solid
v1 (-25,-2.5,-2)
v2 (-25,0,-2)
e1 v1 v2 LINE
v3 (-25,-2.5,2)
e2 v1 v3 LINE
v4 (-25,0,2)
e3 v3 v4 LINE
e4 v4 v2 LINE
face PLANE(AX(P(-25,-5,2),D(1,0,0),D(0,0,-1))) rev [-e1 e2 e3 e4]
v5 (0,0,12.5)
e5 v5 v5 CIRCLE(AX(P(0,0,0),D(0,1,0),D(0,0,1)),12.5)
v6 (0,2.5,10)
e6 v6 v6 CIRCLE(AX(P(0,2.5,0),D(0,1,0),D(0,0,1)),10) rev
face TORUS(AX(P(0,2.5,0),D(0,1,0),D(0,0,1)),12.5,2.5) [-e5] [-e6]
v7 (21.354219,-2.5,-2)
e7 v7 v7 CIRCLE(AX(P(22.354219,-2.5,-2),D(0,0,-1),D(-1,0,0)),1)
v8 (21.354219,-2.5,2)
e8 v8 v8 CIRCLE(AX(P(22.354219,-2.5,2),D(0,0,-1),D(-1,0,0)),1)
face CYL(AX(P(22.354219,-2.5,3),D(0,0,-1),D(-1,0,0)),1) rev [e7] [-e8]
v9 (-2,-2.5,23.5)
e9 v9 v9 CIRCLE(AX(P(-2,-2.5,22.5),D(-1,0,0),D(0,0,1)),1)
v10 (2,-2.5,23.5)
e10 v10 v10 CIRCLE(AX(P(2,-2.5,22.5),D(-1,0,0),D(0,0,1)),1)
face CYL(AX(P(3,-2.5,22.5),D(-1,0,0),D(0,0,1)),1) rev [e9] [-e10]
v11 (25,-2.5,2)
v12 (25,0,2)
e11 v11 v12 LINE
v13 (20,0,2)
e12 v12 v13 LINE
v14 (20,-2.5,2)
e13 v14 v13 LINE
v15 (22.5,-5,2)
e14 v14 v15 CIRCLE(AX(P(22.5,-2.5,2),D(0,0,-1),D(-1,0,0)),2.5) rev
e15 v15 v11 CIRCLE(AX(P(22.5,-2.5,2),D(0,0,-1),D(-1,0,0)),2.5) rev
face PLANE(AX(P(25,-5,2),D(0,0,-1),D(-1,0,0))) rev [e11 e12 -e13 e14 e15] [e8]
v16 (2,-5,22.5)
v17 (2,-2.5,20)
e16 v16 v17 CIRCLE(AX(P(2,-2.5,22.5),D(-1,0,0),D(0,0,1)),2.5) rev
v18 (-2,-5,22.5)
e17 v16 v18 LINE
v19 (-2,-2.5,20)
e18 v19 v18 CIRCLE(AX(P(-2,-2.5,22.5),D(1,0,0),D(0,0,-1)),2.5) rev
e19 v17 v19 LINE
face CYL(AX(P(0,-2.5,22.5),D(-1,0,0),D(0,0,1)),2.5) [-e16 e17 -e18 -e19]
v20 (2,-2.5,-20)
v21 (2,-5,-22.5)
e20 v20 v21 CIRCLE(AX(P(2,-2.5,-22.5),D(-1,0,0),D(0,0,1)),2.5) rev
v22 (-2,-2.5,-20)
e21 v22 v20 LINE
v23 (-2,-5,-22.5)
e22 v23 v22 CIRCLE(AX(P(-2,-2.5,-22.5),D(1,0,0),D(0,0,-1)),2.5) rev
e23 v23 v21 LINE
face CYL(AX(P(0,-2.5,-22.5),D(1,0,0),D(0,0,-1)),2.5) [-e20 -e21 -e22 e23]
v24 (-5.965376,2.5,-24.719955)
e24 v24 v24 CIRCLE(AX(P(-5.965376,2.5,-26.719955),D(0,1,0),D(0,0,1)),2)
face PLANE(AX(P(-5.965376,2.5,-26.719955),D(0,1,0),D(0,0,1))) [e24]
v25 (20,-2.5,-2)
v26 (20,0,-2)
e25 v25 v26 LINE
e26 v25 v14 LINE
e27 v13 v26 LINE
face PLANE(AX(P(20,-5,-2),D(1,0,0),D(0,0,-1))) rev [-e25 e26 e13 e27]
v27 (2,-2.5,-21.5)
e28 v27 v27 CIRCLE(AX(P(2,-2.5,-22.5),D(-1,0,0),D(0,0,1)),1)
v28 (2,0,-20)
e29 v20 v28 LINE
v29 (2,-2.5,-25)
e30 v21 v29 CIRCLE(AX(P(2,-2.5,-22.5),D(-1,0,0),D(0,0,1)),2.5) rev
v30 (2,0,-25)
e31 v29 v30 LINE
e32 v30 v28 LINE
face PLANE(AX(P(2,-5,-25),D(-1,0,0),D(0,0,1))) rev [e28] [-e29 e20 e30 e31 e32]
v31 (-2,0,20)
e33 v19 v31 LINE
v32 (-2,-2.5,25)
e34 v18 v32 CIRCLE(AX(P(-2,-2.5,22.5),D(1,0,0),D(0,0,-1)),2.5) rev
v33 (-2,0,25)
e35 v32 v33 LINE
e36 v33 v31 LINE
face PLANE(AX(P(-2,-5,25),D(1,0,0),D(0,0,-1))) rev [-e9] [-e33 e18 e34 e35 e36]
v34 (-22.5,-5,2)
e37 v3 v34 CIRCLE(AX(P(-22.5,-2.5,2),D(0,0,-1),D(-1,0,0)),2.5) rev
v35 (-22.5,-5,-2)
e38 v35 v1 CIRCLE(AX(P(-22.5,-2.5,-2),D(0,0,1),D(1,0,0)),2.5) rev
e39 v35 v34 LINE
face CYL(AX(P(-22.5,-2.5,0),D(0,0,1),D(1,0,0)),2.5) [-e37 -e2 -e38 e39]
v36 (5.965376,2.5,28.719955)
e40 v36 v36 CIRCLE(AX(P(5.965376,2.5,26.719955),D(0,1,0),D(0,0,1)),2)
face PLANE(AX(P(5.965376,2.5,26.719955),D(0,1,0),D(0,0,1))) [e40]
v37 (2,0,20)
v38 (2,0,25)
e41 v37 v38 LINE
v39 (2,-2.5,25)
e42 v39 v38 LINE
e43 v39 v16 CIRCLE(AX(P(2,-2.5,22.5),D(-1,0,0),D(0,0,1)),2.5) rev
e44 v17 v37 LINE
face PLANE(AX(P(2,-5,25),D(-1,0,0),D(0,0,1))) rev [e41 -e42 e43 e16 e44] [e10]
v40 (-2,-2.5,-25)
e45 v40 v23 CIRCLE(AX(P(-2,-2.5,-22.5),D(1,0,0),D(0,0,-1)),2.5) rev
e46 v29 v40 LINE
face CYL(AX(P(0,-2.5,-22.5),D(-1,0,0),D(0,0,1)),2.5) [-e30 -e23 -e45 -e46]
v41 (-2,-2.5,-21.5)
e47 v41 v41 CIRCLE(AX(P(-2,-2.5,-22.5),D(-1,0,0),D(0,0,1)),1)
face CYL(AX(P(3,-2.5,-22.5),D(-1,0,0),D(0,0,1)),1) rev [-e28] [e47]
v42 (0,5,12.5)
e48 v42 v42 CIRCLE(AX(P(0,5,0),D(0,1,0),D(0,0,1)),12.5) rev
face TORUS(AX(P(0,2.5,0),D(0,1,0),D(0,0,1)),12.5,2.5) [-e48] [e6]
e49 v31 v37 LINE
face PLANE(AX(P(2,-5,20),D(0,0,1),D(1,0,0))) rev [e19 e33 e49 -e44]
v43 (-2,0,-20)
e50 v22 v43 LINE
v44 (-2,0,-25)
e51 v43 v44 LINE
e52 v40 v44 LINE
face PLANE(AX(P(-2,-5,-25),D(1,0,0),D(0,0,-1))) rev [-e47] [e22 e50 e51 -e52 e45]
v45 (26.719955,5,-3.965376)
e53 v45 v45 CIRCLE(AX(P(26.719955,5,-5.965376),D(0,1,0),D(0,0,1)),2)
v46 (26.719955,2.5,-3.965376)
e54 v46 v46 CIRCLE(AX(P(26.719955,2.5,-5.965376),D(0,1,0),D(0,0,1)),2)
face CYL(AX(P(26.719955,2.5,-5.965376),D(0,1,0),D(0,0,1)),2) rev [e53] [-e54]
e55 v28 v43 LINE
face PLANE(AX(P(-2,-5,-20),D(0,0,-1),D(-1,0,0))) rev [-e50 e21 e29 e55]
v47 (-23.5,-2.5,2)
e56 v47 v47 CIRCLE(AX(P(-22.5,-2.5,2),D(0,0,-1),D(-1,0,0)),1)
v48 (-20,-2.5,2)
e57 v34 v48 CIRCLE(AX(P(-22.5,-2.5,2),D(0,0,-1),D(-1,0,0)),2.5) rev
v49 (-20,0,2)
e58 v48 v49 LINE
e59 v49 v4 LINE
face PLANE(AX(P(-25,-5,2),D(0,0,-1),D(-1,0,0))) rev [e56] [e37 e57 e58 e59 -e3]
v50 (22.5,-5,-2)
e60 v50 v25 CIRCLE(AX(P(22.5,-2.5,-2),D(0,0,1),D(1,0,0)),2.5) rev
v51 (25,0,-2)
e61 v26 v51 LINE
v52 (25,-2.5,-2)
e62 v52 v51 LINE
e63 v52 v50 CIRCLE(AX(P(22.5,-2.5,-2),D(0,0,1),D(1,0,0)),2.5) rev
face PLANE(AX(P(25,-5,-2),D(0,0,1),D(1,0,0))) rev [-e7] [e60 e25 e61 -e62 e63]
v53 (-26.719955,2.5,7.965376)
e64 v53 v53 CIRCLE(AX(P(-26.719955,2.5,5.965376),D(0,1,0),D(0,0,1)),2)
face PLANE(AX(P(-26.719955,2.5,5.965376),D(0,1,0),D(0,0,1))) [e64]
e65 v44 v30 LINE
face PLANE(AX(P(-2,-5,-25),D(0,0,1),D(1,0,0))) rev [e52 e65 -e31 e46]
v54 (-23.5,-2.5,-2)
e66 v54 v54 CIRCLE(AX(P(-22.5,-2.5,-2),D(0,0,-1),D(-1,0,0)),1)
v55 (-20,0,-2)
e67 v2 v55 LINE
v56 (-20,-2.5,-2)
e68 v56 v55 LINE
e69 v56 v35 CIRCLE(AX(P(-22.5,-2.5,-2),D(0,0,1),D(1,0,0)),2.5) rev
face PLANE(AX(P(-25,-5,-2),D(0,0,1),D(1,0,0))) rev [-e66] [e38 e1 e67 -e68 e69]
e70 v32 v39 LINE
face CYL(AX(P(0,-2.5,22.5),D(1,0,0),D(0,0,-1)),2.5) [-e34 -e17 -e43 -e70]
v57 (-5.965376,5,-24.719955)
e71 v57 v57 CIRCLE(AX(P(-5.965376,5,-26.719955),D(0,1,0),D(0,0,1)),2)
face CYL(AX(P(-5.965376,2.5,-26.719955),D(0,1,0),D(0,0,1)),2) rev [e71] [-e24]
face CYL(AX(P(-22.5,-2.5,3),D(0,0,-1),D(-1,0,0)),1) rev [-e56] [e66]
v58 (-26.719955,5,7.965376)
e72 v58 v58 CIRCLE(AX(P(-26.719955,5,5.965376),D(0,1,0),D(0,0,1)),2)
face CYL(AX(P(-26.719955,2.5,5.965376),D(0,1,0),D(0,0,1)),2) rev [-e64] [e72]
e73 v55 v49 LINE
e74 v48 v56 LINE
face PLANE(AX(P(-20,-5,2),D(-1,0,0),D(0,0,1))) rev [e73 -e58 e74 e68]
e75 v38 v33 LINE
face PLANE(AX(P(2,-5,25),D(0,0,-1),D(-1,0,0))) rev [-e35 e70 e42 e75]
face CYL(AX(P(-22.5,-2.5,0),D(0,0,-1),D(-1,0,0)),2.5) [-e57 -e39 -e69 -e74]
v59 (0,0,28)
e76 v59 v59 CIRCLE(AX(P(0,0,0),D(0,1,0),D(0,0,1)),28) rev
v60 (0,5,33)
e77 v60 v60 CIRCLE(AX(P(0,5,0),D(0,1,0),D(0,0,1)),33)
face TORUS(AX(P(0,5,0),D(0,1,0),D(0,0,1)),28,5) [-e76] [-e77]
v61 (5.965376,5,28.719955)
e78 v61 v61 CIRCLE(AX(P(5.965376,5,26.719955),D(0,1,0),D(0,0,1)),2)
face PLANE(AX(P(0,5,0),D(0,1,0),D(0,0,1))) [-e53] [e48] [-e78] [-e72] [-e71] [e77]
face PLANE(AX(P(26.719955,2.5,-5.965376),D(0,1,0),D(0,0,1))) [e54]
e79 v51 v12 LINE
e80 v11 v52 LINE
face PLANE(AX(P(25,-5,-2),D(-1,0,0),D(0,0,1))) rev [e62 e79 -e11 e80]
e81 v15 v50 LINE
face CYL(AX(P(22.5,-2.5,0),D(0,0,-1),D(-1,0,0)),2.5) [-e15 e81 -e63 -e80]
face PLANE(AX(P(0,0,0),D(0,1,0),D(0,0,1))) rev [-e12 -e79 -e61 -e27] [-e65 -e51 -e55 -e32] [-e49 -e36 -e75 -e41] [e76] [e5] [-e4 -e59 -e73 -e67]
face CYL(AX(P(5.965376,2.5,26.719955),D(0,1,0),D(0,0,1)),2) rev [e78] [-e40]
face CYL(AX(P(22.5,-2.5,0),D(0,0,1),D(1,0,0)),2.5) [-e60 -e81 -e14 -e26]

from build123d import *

# Parameters (mm, degrees)
SKETCH1_R           = 33
BOSS_EXTRUDE1_DEPTH = 5
SKETCH2_R           = 2
CUT_EXTRUDE1_DEPTH  = 2.5
FILLET1_R           = 5
SKETCH3_W           = 4
SKETCH3_H           = 5
SKETCH3_W_2         = 5
SKETCH3_H_2         = 4
BOSS_EXTRUDE2_DEPTH = 5
FILLET2_R           = 2.5
SKETCH4_R           = 1
CUT_EXTRUDE2_DEPTH  = 5
SKETCH5_R           = 1
CUT_EXTRUDE3_DEPTH  = 5
SKETCH6_R           = 10
CUT_EXTRUDE4_DEPTH  = 5
FILLET3_R           = 2.5


with BuildPart() as part:
    # Sketch1 → Boss-Extrude1 (new body)
    with BuildSketch(Plane(origin=(0, 0, 0), x_dir=(1, 0, 0), z_dir=(0, 1, 0))):
        with Locations(Location((0, 0, 0), (0, 0, 270))):
            Circle(SKETCH1_R)
    extrude(amount=BOSS_EXTRUDE1_DEPTH)

    # Sketch2 → Cut-Extrude1 (cut)
    with BuildSketch(Plane(origin=(0, 5, 0), x_dir=(1, 0, 0), z_dir=(0, 1, 0))):
        with Locations(Location((-26.719955328, -5.965376271, 0), (0, 0, 270))):
            Circle(SKETCH2_R)
        with Locations(Location((-5.965376271, 26.719955328, 0), (0, 0, 270))):
            Circle(SKETCH2_R)
        with Locations(Location((26.719955328, 5.965376271, 0), (0, 0, 270))):
            Circle(SKETCH2_R)
        with Locations(Location((5.965376271, -26.719955328, 0), (0, 0, 270))):
            Circle(SKETCH2_R)
    extrude(amount=-CUT_EXTRUDE1_DEPTH, mode=Mode.SUBTRACT)

    # Fillet1
    fillet1_edges = [part.edges().sort_by_distance(p)[0] for p in [
        (0, 0, -33),
    ]]
    fillet(fillet1_edges, radius=FILLET1_R - 0.0001)  # a hair under: the kernel refuses the full size

    # Sketch3 → Boss-Extrude2 (add)
    with BuildSketch(Plane.XZ):
        with Locations((0, 22.5)):
            Rectangle(SKETCH3_W, SKETCH3_H)
        with Locations((-22.5, 0)):
            Rectangle(SKETCH3_W_2, SKETCH3_H_2)
        with Locations((22.5, 0)):
            Rectangle(SKETCH3_W_2, SKETCH3_H_2)
        with Locations((0, -22.5)):
            Rectangle(SKETCH3_W, SKETCH3_H)
    extrude(amount=BOSS_EXTRUDE2_DEPTH)

    # Fillet2
    fillet2_edges = [part.edges().sort_by_distance(p)[0] for p in [
        (0, -5, 20),
        (0, -5, 25),
        (25, -5, 0),
        (20, -5, 0),
        (0, -5, -20),
        (0, -5, -25),
        (-25, -5, 0),
        (-20, -5, 0),
    ]]
    fillet(fillet2_edges, radius=FILLET2_R - 0.0001)  # a hair under: the kernel refuses the full size

    # Sketch4 → Cut-Extrude2 (cut)
    with BuildSketch(Plane(origin=(0, 0, -2), x_dir=(-1, 0, 0), z_dir=(0, 0, -1))):
        with Locations((22.5, -2.5)):
            Circle(SKETCH4_R)
        with Locations((-22.354219449, -2.5)):
            Circle(SKETCH4_R)
    extrude(amount=-CUT_EXTRUDE2_DEPTH, mode=Mode.SUBTRACT)

    # Sketch5 → Cut-Extrude3 (cut)
    with BuildSketch(Plane.ZY.offset(2)):
        with Locations((22.5, -2.5)):
            Circle(SKETCH5_R)
        with Locations((-22.5, -2.5)):
            Circle(SKETCH5_R)
    extrude(amount=-CUT_EXTRUDE3_DEPTH, mode=Mode.SUBTRACT)

    # Sketch6 → Cut-Extrude4 (cut)
    with BuildSketch(Plane.XZ):
        with Locations(Location((0, 0, 0), (0, 0, 270))):
            Circle(SKETCH6_R)
    extrude(amount=-CUT_EXTRUDE4_DEPTH, mode=Mode.SUBTRACT)

    # Fillet3
    fillet3_edges = [part.edges().sort_by_distance(p)[0] for p in [
        (0, 5, 10),
        (0, 0, 10),
    ]]
    fillet(fillet3_edges, radius=FILLET3_R - 0.0001)  # a hair under: the kernel refuses the full size


solid = part.part
